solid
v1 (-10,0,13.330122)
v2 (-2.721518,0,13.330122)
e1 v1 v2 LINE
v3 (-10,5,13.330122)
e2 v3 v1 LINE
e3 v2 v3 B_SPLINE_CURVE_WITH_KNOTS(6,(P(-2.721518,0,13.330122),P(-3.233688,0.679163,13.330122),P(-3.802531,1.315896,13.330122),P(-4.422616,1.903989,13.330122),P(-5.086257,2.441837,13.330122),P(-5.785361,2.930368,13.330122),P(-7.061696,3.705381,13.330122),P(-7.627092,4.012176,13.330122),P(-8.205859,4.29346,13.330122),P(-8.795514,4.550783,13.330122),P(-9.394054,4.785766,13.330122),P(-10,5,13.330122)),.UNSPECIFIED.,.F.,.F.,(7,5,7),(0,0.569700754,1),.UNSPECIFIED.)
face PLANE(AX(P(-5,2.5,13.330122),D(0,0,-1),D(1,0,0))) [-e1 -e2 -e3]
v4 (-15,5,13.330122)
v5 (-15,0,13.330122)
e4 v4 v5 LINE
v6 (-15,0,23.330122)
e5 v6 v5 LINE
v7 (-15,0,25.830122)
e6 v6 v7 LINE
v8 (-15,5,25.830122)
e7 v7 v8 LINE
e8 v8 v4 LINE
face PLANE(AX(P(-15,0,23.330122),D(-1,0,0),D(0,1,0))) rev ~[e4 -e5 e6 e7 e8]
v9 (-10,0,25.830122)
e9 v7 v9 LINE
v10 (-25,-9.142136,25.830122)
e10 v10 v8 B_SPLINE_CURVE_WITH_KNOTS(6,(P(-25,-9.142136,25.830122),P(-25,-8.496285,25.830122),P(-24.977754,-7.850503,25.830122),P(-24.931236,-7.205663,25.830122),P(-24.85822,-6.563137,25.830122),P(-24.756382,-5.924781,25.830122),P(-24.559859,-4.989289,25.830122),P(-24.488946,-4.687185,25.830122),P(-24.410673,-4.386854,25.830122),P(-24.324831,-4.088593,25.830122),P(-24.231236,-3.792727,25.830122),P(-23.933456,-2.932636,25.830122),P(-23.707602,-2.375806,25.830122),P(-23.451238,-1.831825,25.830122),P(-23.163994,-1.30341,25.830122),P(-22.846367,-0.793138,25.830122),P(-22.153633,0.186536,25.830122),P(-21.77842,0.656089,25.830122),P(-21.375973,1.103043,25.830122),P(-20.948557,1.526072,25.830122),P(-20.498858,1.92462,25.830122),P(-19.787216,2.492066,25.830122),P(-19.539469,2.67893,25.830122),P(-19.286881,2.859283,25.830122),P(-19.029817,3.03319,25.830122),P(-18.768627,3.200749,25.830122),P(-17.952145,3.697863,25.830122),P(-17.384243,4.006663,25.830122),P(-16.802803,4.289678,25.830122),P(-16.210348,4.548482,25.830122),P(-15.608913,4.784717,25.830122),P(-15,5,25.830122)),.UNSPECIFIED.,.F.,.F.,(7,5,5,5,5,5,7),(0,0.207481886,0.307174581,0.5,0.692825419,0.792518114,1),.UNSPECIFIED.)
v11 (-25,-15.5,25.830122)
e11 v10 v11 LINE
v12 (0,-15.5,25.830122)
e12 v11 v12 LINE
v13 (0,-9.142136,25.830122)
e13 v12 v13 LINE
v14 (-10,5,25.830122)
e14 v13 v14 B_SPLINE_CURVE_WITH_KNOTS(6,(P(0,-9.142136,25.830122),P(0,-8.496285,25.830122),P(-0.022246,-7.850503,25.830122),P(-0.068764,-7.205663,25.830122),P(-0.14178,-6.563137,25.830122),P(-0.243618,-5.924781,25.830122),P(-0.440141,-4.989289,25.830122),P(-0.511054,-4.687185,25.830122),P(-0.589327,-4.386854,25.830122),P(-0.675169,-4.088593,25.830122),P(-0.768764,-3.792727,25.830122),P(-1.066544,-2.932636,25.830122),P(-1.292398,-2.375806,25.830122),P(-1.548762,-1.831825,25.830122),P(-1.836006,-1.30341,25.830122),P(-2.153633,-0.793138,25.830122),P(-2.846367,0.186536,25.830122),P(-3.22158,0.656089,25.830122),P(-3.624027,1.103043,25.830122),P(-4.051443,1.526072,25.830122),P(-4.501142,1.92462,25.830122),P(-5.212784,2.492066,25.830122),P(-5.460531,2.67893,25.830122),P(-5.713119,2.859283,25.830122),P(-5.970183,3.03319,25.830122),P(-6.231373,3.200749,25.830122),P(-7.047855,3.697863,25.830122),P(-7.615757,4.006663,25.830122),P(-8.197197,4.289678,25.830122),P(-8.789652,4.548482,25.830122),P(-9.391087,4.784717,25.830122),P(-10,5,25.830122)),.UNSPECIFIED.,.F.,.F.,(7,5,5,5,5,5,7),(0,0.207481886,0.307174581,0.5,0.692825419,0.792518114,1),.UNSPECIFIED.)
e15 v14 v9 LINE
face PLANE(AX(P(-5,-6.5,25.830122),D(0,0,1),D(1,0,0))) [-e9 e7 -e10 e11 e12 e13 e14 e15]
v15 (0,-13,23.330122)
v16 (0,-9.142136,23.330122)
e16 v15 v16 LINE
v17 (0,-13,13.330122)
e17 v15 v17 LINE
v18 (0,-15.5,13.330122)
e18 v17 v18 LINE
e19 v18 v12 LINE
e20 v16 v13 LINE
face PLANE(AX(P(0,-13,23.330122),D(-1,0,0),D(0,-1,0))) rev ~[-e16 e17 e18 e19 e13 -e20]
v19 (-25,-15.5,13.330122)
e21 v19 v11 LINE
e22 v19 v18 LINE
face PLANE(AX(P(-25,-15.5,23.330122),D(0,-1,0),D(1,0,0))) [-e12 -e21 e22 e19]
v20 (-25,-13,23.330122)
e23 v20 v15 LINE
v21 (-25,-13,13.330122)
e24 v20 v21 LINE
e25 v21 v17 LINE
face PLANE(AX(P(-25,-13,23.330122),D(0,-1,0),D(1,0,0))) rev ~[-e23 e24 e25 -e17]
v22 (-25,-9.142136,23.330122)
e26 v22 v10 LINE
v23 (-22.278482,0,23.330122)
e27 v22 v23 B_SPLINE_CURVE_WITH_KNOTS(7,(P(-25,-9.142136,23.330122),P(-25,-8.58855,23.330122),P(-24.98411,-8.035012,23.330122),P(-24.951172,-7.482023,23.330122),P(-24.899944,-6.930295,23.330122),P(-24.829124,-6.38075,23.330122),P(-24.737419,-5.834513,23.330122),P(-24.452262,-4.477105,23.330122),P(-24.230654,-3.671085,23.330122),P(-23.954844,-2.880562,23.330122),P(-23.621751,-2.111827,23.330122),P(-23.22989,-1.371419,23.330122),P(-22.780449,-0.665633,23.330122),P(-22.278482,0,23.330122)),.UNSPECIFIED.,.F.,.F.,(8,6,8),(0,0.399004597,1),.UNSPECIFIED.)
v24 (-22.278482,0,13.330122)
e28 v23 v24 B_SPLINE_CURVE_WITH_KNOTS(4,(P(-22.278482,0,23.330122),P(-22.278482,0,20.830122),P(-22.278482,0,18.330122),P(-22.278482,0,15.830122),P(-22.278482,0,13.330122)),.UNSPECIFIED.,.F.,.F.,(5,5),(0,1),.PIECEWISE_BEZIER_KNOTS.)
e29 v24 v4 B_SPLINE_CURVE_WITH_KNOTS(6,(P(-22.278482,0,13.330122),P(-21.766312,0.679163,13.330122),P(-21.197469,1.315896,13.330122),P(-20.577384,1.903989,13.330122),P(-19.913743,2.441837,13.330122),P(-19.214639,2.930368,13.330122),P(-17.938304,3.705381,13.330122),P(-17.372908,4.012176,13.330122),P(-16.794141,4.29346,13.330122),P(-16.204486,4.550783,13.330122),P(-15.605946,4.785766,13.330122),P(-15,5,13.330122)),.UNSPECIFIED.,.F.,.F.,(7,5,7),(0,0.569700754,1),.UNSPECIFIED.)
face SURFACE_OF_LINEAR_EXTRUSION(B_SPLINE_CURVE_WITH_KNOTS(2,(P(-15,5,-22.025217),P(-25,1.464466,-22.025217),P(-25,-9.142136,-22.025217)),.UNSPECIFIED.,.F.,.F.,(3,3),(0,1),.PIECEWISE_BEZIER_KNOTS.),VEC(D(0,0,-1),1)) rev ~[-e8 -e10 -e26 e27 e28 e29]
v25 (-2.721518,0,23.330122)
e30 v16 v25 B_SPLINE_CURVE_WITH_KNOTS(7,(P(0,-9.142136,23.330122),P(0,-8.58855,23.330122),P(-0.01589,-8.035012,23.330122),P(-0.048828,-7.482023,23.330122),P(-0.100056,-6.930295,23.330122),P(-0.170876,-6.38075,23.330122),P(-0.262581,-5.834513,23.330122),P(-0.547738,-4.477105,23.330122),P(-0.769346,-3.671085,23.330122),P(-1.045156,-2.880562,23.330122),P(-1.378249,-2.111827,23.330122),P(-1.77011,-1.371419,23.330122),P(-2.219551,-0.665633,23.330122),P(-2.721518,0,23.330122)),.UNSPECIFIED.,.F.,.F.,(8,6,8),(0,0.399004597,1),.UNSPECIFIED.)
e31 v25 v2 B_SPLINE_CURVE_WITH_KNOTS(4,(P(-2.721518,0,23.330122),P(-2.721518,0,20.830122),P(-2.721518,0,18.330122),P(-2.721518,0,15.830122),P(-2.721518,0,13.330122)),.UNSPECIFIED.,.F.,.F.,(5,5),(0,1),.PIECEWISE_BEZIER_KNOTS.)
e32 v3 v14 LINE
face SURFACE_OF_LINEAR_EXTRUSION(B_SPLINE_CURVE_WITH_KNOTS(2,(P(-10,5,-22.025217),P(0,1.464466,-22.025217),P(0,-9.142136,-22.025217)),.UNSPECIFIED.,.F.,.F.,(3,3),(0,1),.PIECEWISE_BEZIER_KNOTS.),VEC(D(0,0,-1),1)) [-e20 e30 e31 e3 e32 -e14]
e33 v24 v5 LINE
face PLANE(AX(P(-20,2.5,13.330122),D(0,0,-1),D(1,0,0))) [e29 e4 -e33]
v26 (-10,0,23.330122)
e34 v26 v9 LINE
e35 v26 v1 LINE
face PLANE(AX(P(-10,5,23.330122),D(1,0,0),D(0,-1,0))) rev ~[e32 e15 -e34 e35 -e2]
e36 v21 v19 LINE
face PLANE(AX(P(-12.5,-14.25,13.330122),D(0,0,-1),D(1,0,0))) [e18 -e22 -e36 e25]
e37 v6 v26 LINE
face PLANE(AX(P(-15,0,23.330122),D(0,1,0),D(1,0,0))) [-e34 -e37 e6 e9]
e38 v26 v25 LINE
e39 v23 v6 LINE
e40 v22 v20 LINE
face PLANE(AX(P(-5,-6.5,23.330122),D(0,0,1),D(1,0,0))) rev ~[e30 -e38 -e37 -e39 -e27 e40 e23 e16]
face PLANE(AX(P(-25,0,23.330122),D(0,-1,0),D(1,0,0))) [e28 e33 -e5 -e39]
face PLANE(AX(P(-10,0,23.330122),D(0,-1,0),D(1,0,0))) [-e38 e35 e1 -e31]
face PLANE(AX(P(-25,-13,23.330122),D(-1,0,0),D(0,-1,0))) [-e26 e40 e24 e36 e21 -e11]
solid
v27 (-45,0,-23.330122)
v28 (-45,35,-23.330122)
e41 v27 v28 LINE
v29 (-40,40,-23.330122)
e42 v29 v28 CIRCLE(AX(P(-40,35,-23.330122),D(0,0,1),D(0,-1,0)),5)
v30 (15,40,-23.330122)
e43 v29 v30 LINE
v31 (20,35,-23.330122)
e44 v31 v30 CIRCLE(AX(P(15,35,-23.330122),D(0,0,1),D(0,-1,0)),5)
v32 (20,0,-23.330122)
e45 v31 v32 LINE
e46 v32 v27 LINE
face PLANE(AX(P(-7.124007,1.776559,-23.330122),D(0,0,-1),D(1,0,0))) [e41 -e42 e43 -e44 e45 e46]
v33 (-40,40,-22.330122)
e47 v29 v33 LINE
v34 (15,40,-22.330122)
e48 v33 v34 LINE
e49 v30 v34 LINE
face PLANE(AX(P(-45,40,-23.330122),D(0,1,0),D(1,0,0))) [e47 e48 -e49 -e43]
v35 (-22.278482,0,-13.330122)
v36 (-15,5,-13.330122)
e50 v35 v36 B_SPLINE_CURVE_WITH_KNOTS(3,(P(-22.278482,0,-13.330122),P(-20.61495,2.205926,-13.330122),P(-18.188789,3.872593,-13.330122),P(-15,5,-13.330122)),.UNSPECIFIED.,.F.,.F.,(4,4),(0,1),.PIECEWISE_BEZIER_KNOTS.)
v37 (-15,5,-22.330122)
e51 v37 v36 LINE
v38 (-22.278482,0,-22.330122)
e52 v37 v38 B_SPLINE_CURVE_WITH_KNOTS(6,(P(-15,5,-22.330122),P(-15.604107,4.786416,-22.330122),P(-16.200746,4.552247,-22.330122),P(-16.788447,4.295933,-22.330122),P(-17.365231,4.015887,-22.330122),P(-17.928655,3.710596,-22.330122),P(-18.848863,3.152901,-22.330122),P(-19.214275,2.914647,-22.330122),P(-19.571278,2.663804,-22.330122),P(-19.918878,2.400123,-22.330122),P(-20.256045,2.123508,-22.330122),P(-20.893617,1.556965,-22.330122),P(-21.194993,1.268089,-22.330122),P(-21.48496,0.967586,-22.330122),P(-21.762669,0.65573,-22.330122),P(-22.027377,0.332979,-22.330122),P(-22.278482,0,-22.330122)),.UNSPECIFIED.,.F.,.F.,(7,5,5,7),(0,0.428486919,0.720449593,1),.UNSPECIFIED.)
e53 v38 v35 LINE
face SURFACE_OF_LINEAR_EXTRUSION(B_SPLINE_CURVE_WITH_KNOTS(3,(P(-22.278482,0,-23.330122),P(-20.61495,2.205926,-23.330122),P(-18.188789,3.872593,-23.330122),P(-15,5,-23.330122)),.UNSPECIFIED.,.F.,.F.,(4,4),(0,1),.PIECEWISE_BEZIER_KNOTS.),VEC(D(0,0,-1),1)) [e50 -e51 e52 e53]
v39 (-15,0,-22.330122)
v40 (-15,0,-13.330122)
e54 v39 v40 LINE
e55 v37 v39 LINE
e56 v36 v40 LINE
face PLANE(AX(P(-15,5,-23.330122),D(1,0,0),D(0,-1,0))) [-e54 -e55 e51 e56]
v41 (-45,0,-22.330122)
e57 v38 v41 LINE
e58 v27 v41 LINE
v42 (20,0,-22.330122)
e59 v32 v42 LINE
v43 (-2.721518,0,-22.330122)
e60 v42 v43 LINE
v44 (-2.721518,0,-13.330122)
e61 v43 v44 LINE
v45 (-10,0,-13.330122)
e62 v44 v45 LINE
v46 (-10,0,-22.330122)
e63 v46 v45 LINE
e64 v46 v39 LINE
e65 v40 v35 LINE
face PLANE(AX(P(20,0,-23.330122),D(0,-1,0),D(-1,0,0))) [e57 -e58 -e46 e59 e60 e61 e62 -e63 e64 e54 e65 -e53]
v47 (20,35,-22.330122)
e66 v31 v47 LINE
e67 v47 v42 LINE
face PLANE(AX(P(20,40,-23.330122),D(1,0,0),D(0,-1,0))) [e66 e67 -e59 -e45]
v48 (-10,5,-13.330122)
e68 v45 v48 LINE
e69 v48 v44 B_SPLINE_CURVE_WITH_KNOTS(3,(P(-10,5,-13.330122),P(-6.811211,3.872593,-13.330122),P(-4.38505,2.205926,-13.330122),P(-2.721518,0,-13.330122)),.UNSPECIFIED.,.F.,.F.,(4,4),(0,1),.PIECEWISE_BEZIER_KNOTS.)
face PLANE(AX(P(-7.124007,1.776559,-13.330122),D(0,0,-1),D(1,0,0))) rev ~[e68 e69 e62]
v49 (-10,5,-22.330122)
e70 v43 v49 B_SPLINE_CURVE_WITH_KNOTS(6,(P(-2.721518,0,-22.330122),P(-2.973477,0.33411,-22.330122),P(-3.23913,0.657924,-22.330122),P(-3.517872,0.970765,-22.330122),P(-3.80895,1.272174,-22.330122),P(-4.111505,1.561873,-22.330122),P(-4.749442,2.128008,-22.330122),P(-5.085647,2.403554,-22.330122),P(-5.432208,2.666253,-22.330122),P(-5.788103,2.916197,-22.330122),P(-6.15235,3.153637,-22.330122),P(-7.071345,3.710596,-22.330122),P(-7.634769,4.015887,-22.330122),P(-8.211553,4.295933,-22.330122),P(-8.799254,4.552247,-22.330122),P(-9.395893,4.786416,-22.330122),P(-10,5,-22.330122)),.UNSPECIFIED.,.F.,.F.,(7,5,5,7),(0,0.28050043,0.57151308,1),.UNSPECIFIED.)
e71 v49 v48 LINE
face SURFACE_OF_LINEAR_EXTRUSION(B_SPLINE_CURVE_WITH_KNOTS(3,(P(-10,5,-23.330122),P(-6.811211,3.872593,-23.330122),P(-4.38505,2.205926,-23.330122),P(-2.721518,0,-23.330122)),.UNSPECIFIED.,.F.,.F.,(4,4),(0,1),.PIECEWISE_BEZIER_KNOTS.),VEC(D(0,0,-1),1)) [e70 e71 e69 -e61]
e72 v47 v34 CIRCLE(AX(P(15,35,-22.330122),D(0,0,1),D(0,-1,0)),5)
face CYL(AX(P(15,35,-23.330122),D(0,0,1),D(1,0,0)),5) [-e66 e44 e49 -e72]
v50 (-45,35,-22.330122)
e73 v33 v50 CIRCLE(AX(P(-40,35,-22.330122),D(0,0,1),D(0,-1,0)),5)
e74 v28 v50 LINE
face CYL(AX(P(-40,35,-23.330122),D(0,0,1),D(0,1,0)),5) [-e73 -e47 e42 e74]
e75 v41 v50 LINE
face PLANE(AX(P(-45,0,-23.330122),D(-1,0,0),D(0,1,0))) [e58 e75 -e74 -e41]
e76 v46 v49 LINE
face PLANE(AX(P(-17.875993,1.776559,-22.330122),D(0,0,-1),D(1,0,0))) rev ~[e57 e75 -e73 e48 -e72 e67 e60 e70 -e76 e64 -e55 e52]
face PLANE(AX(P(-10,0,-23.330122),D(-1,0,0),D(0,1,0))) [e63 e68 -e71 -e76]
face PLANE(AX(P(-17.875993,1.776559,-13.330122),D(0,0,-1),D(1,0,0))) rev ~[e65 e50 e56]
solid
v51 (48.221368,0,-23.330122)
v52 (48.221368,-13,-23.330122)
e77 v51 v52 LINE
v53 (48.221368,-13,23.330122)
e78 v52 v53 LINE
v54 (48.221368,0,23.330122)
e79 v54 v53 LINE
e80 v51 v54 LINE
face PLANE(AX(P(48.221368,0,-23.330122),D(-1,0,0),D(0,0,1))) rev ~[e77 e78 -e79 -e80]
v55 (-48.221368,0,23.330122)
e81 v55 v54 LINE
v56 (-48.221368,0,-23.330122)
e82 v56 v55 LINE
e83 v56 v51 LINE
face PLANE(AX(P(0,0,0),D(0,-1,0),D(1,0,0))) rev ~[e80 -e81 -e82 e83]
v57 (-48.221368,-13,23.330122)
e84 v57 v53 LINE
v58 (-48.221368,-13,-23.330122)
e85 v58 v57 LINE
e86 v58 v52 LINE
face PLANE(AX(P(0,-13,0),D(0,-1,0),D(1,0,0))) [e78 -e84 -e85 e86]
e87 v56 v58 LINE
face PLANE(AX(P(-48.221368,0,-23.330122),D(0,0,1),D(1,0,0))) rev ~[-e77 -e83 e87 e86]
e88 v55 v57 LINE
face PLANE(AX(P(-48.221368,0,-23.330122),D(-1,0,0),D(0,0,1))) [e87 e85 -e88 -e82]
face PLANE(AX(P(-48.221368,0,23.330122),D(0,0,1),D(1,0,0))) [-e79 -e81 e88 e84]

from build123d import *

# Parameters (mm, degrees)
F0_W        = 96.4427366853
F0_H        = 46.6602444649
F1_DEPTH    = 13
F2_W        = 10
F2_H        = 13
F2_H_2      = 2.5
F2_W_2      = 5
F3_DEPTH    = 2.5
F4_W        = 25
F4_H        = 2.5
F4_W_2      = 10
F4_H_2      = 5
F5_DEPTH    = 10
F6_T1_DEPTH = 83.2106781187
F6_T3_DEPTH = 83.2106781187
F8_DEPTH    = 1
F9_DEPTH    = 10
F10_R       = 5


# Not quite as in the source:
# - a fillet or chamfer that OpenCascade refuses, or shapes differently, is made with other operations: its cross-section is extruded or revolved along the edge and cut away or added


with BuildPart() as f1:
    # F0 (on Front) → F1 (new body)
    with BuildSketch(Plane.XZ):
        Rectangle(F0_W, F0_H)
    extrude(amount=F1_DEPTH)


with BuildPart() as f3:
    # F2 (on face) → F3 (new body)
    with BuildSketch(Plane.XY.offset(23.3301222324)):
        with Locations((-5, -6.5)):
            Rectangle(F2_W, F2_H)
        with Locations((-5, 1.25)):
            Rectangle(F2_W, F2_H_2)
        with Locations((-12.5, -6.5)):
            Rectangle(F2_W_2, F2_H)
        with Locations((-5, -14.25)):
            Rectangle(F2_W, F2_H_2)
        with Locations((-5, 3.75)):
            Rectangle(F2_W, F2_H_2)
        with Locations((-12.5, -14.25)):
            Rectangle(F2_W_2, F2_H_2)
        with Locations((-20, 1.25)):
            Rectangle(F2_W, F2_H_2)
        with Locations((-20, -6.5)):
            Rectangle(F2_W, F2_H)
        with Locations((-20, -14.25)):
            Rectangle(F2_W, F2_H_2)
        with Locations((-20, 3.75)):
            Rectangle(F2_W, F2_H_2)
    extrude(amount=F3_DEPTH)

    # F4 (on face) → F5 (join)
    with BuildSketch(Plane(origin=(0, 0, 23.3301222324), x_dir=(1, 0, 0), z_dir=(0, 0, -1))):
        with Locations((-12.5, 14.25)):
            Rectangle(F4_W, F4_H)
        with Locations((-20, -2.5)):
            Rectangle(F4_W_2, F4_H_2)
        with Locations((-5, -2.5)):
            Rectangle(F4_W_2, F4_H_2)
    extrude(amount=F5_DEPTH)

    # F6: fillet of radius 15 on 2 edges, made by hand

    # F6_s2 → F6_t1 (cut)
    with BuildSketch(Plane.XY.offset(-22.0252168269)):
        with BuildLine():
            add(Edge.make_bspline(
                [(-10, 5), (0, 1.4644660941), (0, -9.1421356237)],
                knots=[0, 0, 0, 1, 1, 1], degree=2, weights=[1, 1, 1]))
            Line((0, -9.1421356237), (0, 5))
            Line((0, 5), (-10, 5))
        make_face()
    extrude(amount=F6_T1_DEPTH, mode=Mode.SUBTRACT)

    # F6_s4 → F6_t3 (cut)
    with BuildSketch(Plane.XY.offset(-22.0252168269)):
        with BuildLine():
            add(Edge.make_bspline(
                [(-15, 5), (-25, 1.4644660941), (-25, -9.1421356237)],
                knots=[0, 0, 0, 1, 1, 1], degree=2, weights=[1, 1, 1]))
            Line((-25, -9.1421356237), (-25, 5))
            Line((-25, 5), (-15, 5))
        make_face()
    extrude(amount=F6_T3_DEPTH, mode=Mode.SUBTRACT)


with BuildPart() as f8:
    # F7 (on face) → F8 (new body)
    with BuildSketch(Plane(origin=(0, 0, -23.3301222324), x_dir=(1, 0, 0), z_dir=(0, 0, -1))):
        with BuildLine():
            Line((-15, -5), (-15, 0))
            Line((-15, 0), (-22.2784824925, 0))
            add(Edge.make_bspline(
                [(-22.2784824925, 0), (-20.6149497874, -2.2059261859), (-18.1887889565, -3.8725928525), (-15, -5)],
                knots=[0, 0, 0, 0, 1, 1, 1, 1], degree=3))
        make_face()
        Polygon((-10, 0), (-15, 0), (-15, -5), (-15, -40), (-10, -40), (-10, -5), align=None)
        with BuildLine():
            add(Edge.make_bspline(
                [(-22.2784824925, 0), (-20.6149497874, -2.2059261859), (-18.1887889565, -3.8725928525), (-15, -5)],
                knots=[0, 0, 0, 0, 1, 1, 1, 1], degree=3))
            Line((-22.2784824925, 0), (-45, 0))
            Line((-45, 0), (-45, -40))
            Line((-45, -40), (-15, -40))
            Line((-15, -40), (-15, -5))
        make_face()
        with BuildLine():
            Line((-2.7215175075, 0), (-10, 0))
            Line((-10, 0), (-10, -5))
            add(Edge.make_bspline(
                [(-10, -5), (-6.8112110435, -3.8725928525), (-4.3850502126, -2.2059261859), (-2.7215175075, 0)],
                knots=[0, 0, 0, 0, 1, 1, 1, 1], degree=3))
        make_face()
        with BuildLine():
            add(Edge.make_bspline(
                [(-10, -5), (-6.8112110435, -3.8725928525), (-4.3850502126, -2.2059261859), (-2.7215175075, 0)],
                knots=[0, 0, 0, 0, 1, 1, 1, 1], degree=3))
            Line((-10, -5), (-10, -40))
            Line((-10, -40), (20, -40))
            Line((20, -40), (20, 0))
            Line((20, 0), (-2.7215175075, 0))
        make_face()
    extrude(amount=-F8_DEPTH)

    # F7 (on face) → F9 (join)
    with BuildSketch(Plane(origin=(0, 0, -23.3301222324), x_dir=(1, 0, 0), z_dir=(0, 0, -1))):
        with BuildLine():
            Line((-2.7215175075, 0), (-10, 0))
            Line((-10, 0), (-10, -5))
            add(Edge.make_bspline(
                [(-10, -5), (-6.8112110435, -3.8725928525), (-4.3850502126, -2.2059261859), (-2.7215175075, 0)],
                knots=[0, 0, 0, 0, 1, 1, 1, 1], degree=3))
        make_face()
        with BuildLine():
            Line((-15, -5), (-15, 0))
            Line((-15, 0), (-22.2784824925, 0))
            add(Edge.make_bspline(
                [(-22.2784824925, 0), (-20.6149497874, -2.2059261859), (-18.1887889565, -3.8725928525), (-15, -5)],
                knots=[0, 0, 0, 0, 1, 1, 1, 1], degree=3))
        make_face()
    extrude(amount=-F9_DEPTH)

    # F10
    f10_edges = [f8.edges().sort_by_distance(p)[0] for p in [
        (20, 40, -22.830122),
        (-45, 40, -22.830122),
    ]]
    fillet(f10_edges, radius=F10_R)


solid = Compound([f1.part, f3.part, f8.part])
